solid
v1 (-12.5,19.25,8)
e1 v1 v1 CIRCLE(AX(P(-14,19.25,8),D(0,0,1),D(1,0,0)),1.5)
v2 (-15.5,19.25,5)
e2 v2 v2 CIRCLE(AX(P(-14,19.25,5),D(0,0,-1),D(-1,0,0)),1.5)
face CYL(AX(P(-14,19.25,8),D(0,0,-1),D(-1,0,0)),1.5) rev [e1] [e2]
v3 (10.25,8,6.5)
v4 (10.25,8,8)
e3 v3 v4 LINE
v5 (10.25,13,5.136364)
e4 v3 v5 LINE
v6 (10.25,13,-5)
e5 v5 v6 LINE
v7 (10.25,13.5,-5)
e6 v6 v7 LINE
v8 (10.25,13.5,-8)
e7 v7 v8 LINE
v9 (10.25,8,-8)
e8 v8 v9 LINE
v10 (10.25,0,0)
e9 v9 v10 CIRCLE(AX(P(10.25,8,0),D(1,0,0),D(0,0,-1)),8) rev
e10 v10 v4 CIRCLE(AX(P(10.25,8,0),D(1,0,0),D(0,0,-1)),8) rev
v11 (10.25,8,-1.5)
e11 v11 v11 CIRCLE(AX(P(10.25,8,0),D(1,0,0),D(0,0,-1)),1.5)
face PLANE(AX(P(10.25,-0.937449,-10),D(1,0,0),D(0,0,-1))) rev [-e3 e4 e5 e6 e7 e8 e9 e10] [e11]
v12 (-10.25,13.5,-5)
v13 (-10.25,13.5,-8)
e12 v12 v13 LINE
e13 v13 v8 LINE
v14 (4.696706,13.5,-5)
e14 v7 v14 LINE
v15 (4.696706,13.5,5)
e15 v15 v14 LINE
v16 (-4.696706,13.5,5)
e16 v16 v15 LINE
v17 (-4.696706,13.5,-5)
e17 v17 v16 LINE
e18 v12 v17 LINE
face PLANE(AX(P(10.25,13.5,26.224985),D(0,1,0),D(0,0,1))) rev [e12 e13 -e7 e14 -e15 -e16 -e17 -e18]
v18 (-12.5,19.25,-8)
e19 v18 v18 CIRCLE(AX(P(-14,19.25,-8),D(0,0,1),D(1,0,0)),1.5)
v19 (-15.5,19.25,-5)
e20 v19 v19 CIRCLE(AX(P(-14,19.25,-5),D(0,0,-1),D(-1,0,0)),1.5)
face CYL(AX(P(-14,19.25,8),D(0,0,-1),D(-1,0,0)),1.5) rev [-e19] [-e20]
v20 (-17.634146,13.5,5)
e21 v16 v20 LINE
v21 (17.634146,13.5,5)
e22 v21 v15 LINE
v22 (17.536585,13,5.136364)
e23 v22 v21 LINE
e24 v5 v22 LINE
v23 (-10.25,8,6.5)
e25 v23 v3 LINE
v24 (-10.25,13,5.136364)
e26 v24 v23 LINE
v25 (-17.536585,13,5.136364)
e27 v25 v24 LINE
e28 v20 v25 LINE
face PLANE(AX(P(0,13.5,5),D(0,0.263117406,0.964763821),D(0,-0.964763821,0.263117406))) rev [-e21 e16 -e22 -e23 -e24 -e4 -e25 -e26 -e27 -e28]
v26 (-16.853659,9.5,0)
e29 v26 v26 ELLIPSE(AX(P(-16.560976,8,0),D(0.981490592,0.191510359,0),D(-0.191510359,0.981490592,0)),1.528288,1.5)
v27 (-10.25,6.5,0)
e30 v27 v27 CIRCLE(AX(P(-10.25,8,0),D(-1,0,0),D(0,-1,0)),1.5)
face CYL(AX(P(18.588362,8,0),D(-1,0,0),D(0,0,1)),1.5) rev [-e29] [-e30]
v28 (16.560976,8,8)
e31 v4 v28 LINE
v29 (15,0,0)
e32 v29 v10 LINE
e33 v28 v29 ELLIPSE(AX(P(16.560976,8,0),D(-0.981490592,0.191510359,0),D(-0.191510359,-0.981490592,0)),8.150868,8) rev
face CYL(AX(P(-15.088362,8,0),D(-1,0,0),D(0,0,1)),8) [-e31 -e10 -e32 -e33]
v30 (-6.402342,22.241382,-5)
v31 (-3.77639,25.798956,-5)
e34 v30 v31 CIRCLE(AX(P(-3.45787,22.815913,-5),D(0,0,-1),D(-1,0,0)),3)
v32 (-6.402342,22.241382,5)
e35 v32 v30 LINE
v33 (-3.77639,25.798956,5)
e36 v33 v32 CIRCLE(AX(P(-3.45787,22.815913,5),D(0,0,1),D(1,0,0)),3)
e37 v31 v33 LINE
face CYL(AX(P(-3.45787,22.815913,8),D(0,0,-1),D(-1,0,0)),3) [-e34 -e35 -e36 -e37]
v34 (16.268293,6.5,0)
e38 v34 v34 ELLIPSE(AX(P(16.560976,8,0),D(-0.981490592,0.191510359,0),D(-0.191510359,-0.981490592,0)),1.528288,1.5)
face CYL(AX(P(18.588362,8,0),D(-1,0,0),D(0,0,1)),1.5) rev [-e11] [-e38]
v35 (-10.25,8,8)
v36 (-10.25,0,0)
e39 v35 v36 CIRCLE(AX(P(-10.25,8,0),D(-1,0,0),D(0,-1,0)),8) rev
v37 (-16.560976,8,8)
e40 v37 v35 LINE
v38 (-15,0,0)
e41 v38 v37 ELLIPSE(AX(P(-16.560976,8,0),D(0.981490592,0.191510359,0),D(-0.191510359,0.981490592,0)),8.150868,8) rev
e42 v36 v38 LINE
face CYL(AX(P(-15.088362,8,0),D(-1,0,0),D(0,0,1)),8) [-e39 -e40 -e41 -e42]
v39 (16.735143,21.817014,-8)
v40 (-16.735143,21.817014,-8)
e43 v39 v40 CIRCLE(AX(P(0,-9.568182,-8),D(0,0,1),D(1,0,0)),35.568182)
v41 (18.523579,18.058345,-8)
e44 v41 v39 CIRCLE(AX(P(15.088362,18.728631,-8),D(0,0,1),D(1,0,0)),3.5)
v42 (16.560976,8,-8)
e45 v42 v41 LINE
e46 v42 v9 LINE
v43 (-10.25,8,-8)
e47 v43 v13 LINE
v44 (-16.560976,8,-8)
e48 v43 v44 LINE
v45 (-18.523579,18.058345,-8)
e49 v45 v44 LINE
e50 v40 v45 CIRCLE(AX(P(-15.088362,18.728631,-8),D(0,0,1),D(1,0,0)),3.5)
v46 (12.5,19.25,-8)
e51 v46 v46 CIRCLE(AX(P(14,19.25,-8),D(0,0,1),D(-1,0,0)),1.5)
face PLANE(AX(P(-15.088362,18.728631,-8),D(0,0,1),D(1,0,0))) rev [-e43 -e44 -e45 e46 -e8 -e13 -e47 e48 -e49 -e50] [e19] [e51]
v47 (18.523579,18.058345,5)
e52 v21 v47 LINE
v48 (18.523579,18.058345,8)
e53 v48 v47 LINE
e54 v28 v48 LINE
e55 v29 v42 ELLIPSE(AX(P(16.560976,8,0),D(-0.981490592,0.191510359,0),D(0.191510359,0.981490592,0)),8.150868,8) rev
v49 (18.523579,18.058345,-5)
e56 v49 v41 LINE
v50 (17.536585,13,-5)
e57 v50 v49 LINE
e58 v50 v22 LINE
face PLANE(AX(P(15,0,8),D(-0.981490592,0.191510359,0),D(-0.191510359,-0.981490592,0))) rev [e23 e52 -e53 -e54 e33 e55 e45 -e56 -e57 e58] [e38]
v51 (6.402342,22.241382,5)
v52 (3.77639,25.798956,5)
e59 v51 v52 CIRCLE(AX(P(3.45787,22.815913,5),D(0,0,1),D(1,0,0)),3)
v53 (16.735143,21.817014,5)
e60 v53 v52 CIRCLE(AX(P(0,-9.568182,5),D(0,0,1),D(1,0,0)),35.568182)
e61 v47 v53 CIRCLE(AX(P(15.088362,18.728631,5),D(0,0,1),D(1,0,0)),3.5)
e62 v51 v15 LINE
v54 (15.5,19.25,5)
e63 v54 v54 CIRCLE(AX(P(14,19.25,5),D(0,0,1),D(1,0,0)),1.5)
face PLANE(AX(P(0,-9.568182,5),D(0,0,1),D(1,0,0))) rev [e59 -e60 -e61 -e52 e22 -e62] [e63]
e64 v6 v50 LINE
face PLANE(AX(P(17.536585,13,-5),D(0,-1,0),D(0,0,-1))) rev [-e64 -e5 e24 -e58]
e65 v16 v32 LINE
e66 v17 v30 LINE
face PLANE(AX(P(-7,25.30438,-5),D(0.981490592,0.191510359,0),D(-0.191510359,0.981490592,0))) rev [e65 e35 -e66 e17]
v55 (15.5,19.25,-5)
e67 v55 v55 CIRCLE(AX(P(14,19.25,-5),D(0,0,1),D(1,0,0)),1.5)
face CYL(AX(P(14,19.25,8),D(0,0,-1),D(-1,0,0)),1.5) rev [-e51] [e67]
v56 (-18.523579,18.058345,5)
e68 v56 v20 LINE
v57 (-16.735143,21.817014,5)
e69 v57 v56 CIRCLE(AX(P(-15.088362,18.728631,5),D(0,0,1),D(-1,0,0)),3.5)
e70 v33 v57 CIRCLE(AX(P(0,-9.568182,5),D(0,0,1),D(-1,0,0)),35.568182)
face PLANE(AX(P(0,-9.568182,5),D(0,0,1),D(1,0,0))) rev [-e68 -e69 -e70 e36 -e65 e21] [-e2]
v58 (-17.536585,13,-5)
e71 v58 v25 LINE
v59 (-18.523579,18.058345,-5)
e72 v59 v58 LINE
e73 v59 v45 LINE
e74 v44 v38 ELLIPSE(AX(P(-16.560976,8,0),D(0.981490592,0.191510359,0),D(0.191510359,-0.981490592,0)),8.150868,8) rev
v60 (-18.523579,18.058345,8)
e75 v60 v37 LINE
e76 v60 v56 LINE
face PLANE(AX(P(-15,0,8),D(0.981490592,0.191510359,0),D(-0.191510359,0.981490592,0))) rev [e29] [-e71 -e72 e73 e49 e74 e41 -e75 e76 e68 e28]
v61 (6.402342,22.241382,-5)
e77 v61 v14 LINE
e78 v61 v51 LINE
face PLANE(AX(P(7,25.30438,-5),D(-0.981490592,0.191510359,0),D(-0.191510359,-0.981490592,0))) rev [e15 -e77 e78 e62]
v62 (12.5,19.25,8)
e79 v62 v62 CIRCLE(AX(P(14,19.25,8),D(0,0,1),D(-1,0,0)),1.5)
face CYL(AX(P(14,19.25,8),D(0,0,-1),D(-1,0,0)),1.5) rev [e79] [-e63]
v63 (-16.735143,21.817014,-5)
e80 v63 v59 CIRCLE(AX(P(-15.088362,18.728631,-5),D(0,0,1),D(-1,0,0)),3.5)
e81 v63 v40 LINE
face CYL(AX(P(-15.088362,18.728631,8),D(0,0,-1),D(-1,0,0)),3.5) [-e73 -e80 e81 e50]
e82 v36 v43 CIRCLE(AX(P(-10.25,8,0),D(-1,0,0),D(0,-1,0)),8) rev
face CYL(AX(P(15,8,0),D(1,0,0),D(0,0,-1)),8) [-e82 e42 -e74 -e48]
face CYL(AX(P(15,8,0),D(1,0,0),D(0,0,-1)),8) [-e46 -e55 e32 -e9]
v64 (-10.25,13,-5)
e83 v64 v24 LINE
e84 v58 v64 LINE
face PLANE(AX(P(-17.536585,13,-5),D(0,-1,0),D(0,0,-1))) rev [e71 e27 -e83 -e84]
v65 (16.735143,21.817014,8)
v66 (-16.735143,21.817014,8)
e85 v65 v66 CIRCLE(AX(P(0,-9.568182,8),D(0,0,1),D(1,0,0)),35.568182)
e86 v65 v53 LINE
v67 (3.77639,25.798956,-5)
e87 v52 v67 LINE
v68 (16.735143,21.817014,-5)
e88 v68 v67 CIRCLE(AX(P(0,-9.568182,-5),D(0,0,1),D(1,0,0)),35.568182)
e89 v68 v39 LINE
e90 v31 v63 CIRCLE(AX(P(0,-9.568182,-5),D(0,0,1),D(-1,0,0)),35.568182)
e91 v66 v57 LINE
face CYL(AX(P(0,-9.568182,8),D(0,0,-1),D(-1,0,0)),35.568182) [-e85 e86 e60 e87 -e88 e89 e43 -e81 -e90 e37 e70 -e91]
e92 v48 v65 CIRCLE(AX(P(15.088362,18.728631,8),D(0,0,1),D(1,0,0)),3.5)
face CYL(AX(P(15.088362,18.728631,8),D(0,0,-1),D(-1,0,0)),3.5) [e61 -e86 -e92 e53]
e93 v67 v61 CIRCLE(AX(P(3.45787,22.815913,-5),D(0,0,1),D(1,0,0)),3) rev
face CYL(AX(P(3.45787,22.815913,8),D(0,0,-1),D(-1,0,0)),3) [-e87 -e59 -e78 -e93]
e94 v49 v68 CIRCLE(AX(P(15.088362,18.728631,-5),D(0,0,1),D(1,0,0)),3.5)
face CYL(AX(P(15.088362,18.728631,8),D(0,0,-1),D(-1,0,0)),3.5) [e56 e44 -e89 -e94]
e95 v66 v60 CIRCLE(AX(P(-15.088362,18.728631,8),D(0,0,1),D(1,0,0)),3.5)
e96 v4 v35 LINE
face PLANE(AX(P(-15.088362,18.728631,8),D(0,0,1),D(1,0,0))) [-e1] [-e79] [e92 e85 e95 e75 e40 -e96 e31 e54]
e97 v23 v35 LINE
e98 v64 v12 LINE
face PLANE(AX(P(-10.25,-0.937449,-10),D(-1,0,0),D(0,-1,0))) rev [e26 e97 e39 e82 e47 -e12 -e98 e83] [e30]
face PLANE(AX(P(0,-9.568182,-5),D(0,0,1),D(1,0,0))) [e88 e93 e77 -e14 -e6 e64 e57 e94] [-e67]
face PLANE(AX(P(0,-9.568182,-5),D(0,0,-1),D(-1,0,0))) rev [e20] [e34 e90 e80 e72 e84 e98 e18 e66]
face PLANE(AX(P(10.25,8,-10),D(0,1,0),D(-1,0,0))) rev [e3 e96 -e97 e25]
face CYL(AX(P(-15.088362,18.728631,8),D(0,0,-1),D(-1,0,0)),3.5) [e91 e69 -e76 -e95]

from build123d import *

# Parameters (mm, degrees)
ESQUISSE1_R                  = 1.5
BOSS_EXTRU_1_DEPTH           = 8
CONG_1_R                     = 8
ESQUISSE2_W                  = 20.5
ESQUISSE2_H                  = 8.937448888
ENL_V_MAT_EXTRU_1_DEPTH      = 10
ENL_V_MAT_EXTRU_2_DEPTH      = 5
ESQUISSE4_W                  = 5.650854606
ESQUISSE4_H                  = 10
ENL_V_MAT_EXTRU_3_DEPTH      = 5
ENL_V_MAT_EXTRU_4_DEPTH      = 40.644055588
ENL_V_MAT_EXTRU_4_DEPTH_BACK = 40.644055588
ESQUISSE6_R                  = 1.5
ENL_V_MAT_EXTRU_5_REACH      = 37.743
ESQUISSE7_W                  = 20.5
ESQUISSE7_H                  = 5.5
CHANFREIN1_SIZE2             = 1.5
CHANFREIN1_SIZE              = 5.5
CONG_2_R                     = 3


with BuildPart() as part:
    # Esquisse1 → Boss.-Extru.1 (new, symmetric)
    with BuildSketch(Plane.XY):
        with BuildLine():
            Line((15, 0), (-15, 0))
            Line((-15, 0), (-18.52357943, 18.05834458))
            ThreePointArc((-18.52357943, 18.05834458), (-18.248833113, 20.232434219), (-16.735143225, 21.817014359))
            ThreePointArc((-16.735143225, 21.817014359), (0, 26), (16.735143225, 21.817014359))
            ThreePointArc((16.735143225, 21.817014359), (18.248833113, 20.232434219), (18.52357943, 18.05834458))
            Line((18.52357943, 18.05834458), (15, 0))
        make_face()
        with Locations((-14, 19.25)):
            Circle(ESQUISSE1_R, mode=Mode.SUBTRACT)
        with Locations(Location((14, 19.25, 0), (0, 0, 180))):
            Circle(ESQUISSE1_R, mode=Mode.SUBTRACT)
    extrude(amount=BOSS_EXTRU_1_DEPTH, both=True)

    # Congé1
    cong_1_edges = [part.edges().sort_by_distance(p)[0] for p in [
        (0, 0, -8),
        (0, 0, 8),
    ]]
    fillet(cong_1_edges, radius=CONG_1_R - 0.0001)  # a hair under: the kernel refuses the full size

    # Esquisse2 → Enlèv. mat.-Extru.1 (cut, symmetric)
    with BuildSketch(Plane.XY):
        with Locations((0, 3.531275556)):
            Rectangle(ESQUISSE2_W, ESQUISSE2_H)
    extrude(amount=ENL_V_MAT_EXTRU_1_DEPTH, both=True, mode=Mode.SUBTRACT)

    # Esquisse3 → Enlèv. mat.-Extru.2 (cut, symmetric)
    with BuildSketch(Plane.XY):
        with BuildLine():
            Line((7, 25.304379858), (4.599145394, 13))
            Line((4.599145394, 13), (17.536585366, 13))
            Line((17.536585366, 13), (18.52357943, 18.05834458))
            ThreePointArc((18.52357943, 18.05834458), (18.248833113, 20.232434219), (16.735143225, 21.817014359))
            ThreePointArc((16.735143225, 21.817014359), (11.994985849, 23.916379883), (7, 25.304379858))
        make_face()
        with BuildLine():
            Line((-17.536585366, 13), (-18.52357943, 18.05834458))
            ThreePointArc((-18.52357943, 18.05834458), (-18.248833113, 20.232434219), (-16.735143225, 21.817014359))
            ThreePointArc((-16.735143225, 21.817014359), (-11.994985849, 23.916379883), (-7, 25.304379858))
            Line((-7, 25.304379858), (-4.599145394, 13))
            Line((-4.599145394, 13), (-17.536585366, 13))
        make_face()
    extrude(amount=ENL_V_MAT_EXTRU_2_DEPTH, both=True, mode=Mode.SUBTRACT)

    # Esquisse4 → Enlèv. mat.-Extru.3 (cut)
    with BuildSketch(Plane(origin=(0, 13, 0), x_dir=(1, 0, 0), z_dir=(0, 1, 0))):
        with Locations((7.424572697, 0)):
            Rectangle(ESQUISSE4_W, ESQUISSE4_H)
        with Locations((-7.424572697, 0)):
            Rectangle(ESQUISSE4_W, ESQUISSE4_H)
    extrude(amount=-ENL_V_MAT_EXTRU_3_DEPTH, mode=Mode.SUBTRACT)

    # Esquisse6 → Enlèv. mat.-Extru.4 (cut, two sides: drawn at the far end of the back side and taken through both)
    with BuildSketch(Plane.ZY.offset(-10.25).offset(-ENL_V_MAT_EXTRU_4_DEPTH_BACK)):
        with Locations(Location((0, 8, 0), (0, 0, 270))):
            Circle(ESQUISSE6_R)
    extrude(amount=ENL_V_MAT_EXTRU_4_DEPTH + ENL_V_MAT_EXTRU_4_DEPTH_BACK, mode=Mode.SUBTRACT)

    # Enlèv. mat.-Extru.5: up to this face of the body (flat: up to its plane)
    enl_v_mat_extru_5_end = Plane(part.part.faces().sort_by_distance((10.657947806, 16.753093671, 5))[0])
    # Esquisse7 → Enlèv. mat.-Extru.5 (cut, up to the picked face)
    with BuildSketch(Plane(origin=(0, 0, -8), x_dir=(-1, 0, 0), z_dir=(0, 0, -1)), mode=Mode.PRIVATE) as enl_v_mat_extru_5_sk1:
        with Locations((0, 10.75)):
            Rectangle(ESQUISSE7_W, ESQUISSE7_H)
    enl_v_mat_extru_5_tool1 = split(extrude(enl_v_mat_extru_5_sk1.sketch, amount=-ENL_V_MAT_EXTRU_5_REACH, mode=Mode.PRIVATE), bisect_by=enl_v_mat_extru_5_end, keep=Keep.BOTH, mode=Mode.PRIVATE)
    add(enl_v_mat_extru_5_tool1.solids().sort_by(Axis((0, 10.75, -8), (0, 0, 1)))[0], mode=Mode.SUBTRACT)

    # Chanfrein1
    chanfrein1_edges = [part.edges().sort_by_distance(p)[0] for p in [
        (0, 8, 5),
    ]]
    chanfrein1_side = [part.faces().sort_by_distance(p)[0] for p in [
        (0, 8.03, 5),
    ]]
    chamfer(chanfrein1_edges, length=CHANFREIN1_SIZE - 0.0001, length2=CHANFREIN1_SIZE2 - 0.0001, reference=chanfrein1_side[0])  # a hair under: the kernel refuses the full size

    # Congé2
    cong_2_edges = [part.edges().sort_by_distance(p)[0] for p in [
        (7, 25.304379858, 0),
        (-7, 25.304379858, 0),
    ]]
    fillet(cong_2_edges, radius=CONG_2_R)


solid = part.part
